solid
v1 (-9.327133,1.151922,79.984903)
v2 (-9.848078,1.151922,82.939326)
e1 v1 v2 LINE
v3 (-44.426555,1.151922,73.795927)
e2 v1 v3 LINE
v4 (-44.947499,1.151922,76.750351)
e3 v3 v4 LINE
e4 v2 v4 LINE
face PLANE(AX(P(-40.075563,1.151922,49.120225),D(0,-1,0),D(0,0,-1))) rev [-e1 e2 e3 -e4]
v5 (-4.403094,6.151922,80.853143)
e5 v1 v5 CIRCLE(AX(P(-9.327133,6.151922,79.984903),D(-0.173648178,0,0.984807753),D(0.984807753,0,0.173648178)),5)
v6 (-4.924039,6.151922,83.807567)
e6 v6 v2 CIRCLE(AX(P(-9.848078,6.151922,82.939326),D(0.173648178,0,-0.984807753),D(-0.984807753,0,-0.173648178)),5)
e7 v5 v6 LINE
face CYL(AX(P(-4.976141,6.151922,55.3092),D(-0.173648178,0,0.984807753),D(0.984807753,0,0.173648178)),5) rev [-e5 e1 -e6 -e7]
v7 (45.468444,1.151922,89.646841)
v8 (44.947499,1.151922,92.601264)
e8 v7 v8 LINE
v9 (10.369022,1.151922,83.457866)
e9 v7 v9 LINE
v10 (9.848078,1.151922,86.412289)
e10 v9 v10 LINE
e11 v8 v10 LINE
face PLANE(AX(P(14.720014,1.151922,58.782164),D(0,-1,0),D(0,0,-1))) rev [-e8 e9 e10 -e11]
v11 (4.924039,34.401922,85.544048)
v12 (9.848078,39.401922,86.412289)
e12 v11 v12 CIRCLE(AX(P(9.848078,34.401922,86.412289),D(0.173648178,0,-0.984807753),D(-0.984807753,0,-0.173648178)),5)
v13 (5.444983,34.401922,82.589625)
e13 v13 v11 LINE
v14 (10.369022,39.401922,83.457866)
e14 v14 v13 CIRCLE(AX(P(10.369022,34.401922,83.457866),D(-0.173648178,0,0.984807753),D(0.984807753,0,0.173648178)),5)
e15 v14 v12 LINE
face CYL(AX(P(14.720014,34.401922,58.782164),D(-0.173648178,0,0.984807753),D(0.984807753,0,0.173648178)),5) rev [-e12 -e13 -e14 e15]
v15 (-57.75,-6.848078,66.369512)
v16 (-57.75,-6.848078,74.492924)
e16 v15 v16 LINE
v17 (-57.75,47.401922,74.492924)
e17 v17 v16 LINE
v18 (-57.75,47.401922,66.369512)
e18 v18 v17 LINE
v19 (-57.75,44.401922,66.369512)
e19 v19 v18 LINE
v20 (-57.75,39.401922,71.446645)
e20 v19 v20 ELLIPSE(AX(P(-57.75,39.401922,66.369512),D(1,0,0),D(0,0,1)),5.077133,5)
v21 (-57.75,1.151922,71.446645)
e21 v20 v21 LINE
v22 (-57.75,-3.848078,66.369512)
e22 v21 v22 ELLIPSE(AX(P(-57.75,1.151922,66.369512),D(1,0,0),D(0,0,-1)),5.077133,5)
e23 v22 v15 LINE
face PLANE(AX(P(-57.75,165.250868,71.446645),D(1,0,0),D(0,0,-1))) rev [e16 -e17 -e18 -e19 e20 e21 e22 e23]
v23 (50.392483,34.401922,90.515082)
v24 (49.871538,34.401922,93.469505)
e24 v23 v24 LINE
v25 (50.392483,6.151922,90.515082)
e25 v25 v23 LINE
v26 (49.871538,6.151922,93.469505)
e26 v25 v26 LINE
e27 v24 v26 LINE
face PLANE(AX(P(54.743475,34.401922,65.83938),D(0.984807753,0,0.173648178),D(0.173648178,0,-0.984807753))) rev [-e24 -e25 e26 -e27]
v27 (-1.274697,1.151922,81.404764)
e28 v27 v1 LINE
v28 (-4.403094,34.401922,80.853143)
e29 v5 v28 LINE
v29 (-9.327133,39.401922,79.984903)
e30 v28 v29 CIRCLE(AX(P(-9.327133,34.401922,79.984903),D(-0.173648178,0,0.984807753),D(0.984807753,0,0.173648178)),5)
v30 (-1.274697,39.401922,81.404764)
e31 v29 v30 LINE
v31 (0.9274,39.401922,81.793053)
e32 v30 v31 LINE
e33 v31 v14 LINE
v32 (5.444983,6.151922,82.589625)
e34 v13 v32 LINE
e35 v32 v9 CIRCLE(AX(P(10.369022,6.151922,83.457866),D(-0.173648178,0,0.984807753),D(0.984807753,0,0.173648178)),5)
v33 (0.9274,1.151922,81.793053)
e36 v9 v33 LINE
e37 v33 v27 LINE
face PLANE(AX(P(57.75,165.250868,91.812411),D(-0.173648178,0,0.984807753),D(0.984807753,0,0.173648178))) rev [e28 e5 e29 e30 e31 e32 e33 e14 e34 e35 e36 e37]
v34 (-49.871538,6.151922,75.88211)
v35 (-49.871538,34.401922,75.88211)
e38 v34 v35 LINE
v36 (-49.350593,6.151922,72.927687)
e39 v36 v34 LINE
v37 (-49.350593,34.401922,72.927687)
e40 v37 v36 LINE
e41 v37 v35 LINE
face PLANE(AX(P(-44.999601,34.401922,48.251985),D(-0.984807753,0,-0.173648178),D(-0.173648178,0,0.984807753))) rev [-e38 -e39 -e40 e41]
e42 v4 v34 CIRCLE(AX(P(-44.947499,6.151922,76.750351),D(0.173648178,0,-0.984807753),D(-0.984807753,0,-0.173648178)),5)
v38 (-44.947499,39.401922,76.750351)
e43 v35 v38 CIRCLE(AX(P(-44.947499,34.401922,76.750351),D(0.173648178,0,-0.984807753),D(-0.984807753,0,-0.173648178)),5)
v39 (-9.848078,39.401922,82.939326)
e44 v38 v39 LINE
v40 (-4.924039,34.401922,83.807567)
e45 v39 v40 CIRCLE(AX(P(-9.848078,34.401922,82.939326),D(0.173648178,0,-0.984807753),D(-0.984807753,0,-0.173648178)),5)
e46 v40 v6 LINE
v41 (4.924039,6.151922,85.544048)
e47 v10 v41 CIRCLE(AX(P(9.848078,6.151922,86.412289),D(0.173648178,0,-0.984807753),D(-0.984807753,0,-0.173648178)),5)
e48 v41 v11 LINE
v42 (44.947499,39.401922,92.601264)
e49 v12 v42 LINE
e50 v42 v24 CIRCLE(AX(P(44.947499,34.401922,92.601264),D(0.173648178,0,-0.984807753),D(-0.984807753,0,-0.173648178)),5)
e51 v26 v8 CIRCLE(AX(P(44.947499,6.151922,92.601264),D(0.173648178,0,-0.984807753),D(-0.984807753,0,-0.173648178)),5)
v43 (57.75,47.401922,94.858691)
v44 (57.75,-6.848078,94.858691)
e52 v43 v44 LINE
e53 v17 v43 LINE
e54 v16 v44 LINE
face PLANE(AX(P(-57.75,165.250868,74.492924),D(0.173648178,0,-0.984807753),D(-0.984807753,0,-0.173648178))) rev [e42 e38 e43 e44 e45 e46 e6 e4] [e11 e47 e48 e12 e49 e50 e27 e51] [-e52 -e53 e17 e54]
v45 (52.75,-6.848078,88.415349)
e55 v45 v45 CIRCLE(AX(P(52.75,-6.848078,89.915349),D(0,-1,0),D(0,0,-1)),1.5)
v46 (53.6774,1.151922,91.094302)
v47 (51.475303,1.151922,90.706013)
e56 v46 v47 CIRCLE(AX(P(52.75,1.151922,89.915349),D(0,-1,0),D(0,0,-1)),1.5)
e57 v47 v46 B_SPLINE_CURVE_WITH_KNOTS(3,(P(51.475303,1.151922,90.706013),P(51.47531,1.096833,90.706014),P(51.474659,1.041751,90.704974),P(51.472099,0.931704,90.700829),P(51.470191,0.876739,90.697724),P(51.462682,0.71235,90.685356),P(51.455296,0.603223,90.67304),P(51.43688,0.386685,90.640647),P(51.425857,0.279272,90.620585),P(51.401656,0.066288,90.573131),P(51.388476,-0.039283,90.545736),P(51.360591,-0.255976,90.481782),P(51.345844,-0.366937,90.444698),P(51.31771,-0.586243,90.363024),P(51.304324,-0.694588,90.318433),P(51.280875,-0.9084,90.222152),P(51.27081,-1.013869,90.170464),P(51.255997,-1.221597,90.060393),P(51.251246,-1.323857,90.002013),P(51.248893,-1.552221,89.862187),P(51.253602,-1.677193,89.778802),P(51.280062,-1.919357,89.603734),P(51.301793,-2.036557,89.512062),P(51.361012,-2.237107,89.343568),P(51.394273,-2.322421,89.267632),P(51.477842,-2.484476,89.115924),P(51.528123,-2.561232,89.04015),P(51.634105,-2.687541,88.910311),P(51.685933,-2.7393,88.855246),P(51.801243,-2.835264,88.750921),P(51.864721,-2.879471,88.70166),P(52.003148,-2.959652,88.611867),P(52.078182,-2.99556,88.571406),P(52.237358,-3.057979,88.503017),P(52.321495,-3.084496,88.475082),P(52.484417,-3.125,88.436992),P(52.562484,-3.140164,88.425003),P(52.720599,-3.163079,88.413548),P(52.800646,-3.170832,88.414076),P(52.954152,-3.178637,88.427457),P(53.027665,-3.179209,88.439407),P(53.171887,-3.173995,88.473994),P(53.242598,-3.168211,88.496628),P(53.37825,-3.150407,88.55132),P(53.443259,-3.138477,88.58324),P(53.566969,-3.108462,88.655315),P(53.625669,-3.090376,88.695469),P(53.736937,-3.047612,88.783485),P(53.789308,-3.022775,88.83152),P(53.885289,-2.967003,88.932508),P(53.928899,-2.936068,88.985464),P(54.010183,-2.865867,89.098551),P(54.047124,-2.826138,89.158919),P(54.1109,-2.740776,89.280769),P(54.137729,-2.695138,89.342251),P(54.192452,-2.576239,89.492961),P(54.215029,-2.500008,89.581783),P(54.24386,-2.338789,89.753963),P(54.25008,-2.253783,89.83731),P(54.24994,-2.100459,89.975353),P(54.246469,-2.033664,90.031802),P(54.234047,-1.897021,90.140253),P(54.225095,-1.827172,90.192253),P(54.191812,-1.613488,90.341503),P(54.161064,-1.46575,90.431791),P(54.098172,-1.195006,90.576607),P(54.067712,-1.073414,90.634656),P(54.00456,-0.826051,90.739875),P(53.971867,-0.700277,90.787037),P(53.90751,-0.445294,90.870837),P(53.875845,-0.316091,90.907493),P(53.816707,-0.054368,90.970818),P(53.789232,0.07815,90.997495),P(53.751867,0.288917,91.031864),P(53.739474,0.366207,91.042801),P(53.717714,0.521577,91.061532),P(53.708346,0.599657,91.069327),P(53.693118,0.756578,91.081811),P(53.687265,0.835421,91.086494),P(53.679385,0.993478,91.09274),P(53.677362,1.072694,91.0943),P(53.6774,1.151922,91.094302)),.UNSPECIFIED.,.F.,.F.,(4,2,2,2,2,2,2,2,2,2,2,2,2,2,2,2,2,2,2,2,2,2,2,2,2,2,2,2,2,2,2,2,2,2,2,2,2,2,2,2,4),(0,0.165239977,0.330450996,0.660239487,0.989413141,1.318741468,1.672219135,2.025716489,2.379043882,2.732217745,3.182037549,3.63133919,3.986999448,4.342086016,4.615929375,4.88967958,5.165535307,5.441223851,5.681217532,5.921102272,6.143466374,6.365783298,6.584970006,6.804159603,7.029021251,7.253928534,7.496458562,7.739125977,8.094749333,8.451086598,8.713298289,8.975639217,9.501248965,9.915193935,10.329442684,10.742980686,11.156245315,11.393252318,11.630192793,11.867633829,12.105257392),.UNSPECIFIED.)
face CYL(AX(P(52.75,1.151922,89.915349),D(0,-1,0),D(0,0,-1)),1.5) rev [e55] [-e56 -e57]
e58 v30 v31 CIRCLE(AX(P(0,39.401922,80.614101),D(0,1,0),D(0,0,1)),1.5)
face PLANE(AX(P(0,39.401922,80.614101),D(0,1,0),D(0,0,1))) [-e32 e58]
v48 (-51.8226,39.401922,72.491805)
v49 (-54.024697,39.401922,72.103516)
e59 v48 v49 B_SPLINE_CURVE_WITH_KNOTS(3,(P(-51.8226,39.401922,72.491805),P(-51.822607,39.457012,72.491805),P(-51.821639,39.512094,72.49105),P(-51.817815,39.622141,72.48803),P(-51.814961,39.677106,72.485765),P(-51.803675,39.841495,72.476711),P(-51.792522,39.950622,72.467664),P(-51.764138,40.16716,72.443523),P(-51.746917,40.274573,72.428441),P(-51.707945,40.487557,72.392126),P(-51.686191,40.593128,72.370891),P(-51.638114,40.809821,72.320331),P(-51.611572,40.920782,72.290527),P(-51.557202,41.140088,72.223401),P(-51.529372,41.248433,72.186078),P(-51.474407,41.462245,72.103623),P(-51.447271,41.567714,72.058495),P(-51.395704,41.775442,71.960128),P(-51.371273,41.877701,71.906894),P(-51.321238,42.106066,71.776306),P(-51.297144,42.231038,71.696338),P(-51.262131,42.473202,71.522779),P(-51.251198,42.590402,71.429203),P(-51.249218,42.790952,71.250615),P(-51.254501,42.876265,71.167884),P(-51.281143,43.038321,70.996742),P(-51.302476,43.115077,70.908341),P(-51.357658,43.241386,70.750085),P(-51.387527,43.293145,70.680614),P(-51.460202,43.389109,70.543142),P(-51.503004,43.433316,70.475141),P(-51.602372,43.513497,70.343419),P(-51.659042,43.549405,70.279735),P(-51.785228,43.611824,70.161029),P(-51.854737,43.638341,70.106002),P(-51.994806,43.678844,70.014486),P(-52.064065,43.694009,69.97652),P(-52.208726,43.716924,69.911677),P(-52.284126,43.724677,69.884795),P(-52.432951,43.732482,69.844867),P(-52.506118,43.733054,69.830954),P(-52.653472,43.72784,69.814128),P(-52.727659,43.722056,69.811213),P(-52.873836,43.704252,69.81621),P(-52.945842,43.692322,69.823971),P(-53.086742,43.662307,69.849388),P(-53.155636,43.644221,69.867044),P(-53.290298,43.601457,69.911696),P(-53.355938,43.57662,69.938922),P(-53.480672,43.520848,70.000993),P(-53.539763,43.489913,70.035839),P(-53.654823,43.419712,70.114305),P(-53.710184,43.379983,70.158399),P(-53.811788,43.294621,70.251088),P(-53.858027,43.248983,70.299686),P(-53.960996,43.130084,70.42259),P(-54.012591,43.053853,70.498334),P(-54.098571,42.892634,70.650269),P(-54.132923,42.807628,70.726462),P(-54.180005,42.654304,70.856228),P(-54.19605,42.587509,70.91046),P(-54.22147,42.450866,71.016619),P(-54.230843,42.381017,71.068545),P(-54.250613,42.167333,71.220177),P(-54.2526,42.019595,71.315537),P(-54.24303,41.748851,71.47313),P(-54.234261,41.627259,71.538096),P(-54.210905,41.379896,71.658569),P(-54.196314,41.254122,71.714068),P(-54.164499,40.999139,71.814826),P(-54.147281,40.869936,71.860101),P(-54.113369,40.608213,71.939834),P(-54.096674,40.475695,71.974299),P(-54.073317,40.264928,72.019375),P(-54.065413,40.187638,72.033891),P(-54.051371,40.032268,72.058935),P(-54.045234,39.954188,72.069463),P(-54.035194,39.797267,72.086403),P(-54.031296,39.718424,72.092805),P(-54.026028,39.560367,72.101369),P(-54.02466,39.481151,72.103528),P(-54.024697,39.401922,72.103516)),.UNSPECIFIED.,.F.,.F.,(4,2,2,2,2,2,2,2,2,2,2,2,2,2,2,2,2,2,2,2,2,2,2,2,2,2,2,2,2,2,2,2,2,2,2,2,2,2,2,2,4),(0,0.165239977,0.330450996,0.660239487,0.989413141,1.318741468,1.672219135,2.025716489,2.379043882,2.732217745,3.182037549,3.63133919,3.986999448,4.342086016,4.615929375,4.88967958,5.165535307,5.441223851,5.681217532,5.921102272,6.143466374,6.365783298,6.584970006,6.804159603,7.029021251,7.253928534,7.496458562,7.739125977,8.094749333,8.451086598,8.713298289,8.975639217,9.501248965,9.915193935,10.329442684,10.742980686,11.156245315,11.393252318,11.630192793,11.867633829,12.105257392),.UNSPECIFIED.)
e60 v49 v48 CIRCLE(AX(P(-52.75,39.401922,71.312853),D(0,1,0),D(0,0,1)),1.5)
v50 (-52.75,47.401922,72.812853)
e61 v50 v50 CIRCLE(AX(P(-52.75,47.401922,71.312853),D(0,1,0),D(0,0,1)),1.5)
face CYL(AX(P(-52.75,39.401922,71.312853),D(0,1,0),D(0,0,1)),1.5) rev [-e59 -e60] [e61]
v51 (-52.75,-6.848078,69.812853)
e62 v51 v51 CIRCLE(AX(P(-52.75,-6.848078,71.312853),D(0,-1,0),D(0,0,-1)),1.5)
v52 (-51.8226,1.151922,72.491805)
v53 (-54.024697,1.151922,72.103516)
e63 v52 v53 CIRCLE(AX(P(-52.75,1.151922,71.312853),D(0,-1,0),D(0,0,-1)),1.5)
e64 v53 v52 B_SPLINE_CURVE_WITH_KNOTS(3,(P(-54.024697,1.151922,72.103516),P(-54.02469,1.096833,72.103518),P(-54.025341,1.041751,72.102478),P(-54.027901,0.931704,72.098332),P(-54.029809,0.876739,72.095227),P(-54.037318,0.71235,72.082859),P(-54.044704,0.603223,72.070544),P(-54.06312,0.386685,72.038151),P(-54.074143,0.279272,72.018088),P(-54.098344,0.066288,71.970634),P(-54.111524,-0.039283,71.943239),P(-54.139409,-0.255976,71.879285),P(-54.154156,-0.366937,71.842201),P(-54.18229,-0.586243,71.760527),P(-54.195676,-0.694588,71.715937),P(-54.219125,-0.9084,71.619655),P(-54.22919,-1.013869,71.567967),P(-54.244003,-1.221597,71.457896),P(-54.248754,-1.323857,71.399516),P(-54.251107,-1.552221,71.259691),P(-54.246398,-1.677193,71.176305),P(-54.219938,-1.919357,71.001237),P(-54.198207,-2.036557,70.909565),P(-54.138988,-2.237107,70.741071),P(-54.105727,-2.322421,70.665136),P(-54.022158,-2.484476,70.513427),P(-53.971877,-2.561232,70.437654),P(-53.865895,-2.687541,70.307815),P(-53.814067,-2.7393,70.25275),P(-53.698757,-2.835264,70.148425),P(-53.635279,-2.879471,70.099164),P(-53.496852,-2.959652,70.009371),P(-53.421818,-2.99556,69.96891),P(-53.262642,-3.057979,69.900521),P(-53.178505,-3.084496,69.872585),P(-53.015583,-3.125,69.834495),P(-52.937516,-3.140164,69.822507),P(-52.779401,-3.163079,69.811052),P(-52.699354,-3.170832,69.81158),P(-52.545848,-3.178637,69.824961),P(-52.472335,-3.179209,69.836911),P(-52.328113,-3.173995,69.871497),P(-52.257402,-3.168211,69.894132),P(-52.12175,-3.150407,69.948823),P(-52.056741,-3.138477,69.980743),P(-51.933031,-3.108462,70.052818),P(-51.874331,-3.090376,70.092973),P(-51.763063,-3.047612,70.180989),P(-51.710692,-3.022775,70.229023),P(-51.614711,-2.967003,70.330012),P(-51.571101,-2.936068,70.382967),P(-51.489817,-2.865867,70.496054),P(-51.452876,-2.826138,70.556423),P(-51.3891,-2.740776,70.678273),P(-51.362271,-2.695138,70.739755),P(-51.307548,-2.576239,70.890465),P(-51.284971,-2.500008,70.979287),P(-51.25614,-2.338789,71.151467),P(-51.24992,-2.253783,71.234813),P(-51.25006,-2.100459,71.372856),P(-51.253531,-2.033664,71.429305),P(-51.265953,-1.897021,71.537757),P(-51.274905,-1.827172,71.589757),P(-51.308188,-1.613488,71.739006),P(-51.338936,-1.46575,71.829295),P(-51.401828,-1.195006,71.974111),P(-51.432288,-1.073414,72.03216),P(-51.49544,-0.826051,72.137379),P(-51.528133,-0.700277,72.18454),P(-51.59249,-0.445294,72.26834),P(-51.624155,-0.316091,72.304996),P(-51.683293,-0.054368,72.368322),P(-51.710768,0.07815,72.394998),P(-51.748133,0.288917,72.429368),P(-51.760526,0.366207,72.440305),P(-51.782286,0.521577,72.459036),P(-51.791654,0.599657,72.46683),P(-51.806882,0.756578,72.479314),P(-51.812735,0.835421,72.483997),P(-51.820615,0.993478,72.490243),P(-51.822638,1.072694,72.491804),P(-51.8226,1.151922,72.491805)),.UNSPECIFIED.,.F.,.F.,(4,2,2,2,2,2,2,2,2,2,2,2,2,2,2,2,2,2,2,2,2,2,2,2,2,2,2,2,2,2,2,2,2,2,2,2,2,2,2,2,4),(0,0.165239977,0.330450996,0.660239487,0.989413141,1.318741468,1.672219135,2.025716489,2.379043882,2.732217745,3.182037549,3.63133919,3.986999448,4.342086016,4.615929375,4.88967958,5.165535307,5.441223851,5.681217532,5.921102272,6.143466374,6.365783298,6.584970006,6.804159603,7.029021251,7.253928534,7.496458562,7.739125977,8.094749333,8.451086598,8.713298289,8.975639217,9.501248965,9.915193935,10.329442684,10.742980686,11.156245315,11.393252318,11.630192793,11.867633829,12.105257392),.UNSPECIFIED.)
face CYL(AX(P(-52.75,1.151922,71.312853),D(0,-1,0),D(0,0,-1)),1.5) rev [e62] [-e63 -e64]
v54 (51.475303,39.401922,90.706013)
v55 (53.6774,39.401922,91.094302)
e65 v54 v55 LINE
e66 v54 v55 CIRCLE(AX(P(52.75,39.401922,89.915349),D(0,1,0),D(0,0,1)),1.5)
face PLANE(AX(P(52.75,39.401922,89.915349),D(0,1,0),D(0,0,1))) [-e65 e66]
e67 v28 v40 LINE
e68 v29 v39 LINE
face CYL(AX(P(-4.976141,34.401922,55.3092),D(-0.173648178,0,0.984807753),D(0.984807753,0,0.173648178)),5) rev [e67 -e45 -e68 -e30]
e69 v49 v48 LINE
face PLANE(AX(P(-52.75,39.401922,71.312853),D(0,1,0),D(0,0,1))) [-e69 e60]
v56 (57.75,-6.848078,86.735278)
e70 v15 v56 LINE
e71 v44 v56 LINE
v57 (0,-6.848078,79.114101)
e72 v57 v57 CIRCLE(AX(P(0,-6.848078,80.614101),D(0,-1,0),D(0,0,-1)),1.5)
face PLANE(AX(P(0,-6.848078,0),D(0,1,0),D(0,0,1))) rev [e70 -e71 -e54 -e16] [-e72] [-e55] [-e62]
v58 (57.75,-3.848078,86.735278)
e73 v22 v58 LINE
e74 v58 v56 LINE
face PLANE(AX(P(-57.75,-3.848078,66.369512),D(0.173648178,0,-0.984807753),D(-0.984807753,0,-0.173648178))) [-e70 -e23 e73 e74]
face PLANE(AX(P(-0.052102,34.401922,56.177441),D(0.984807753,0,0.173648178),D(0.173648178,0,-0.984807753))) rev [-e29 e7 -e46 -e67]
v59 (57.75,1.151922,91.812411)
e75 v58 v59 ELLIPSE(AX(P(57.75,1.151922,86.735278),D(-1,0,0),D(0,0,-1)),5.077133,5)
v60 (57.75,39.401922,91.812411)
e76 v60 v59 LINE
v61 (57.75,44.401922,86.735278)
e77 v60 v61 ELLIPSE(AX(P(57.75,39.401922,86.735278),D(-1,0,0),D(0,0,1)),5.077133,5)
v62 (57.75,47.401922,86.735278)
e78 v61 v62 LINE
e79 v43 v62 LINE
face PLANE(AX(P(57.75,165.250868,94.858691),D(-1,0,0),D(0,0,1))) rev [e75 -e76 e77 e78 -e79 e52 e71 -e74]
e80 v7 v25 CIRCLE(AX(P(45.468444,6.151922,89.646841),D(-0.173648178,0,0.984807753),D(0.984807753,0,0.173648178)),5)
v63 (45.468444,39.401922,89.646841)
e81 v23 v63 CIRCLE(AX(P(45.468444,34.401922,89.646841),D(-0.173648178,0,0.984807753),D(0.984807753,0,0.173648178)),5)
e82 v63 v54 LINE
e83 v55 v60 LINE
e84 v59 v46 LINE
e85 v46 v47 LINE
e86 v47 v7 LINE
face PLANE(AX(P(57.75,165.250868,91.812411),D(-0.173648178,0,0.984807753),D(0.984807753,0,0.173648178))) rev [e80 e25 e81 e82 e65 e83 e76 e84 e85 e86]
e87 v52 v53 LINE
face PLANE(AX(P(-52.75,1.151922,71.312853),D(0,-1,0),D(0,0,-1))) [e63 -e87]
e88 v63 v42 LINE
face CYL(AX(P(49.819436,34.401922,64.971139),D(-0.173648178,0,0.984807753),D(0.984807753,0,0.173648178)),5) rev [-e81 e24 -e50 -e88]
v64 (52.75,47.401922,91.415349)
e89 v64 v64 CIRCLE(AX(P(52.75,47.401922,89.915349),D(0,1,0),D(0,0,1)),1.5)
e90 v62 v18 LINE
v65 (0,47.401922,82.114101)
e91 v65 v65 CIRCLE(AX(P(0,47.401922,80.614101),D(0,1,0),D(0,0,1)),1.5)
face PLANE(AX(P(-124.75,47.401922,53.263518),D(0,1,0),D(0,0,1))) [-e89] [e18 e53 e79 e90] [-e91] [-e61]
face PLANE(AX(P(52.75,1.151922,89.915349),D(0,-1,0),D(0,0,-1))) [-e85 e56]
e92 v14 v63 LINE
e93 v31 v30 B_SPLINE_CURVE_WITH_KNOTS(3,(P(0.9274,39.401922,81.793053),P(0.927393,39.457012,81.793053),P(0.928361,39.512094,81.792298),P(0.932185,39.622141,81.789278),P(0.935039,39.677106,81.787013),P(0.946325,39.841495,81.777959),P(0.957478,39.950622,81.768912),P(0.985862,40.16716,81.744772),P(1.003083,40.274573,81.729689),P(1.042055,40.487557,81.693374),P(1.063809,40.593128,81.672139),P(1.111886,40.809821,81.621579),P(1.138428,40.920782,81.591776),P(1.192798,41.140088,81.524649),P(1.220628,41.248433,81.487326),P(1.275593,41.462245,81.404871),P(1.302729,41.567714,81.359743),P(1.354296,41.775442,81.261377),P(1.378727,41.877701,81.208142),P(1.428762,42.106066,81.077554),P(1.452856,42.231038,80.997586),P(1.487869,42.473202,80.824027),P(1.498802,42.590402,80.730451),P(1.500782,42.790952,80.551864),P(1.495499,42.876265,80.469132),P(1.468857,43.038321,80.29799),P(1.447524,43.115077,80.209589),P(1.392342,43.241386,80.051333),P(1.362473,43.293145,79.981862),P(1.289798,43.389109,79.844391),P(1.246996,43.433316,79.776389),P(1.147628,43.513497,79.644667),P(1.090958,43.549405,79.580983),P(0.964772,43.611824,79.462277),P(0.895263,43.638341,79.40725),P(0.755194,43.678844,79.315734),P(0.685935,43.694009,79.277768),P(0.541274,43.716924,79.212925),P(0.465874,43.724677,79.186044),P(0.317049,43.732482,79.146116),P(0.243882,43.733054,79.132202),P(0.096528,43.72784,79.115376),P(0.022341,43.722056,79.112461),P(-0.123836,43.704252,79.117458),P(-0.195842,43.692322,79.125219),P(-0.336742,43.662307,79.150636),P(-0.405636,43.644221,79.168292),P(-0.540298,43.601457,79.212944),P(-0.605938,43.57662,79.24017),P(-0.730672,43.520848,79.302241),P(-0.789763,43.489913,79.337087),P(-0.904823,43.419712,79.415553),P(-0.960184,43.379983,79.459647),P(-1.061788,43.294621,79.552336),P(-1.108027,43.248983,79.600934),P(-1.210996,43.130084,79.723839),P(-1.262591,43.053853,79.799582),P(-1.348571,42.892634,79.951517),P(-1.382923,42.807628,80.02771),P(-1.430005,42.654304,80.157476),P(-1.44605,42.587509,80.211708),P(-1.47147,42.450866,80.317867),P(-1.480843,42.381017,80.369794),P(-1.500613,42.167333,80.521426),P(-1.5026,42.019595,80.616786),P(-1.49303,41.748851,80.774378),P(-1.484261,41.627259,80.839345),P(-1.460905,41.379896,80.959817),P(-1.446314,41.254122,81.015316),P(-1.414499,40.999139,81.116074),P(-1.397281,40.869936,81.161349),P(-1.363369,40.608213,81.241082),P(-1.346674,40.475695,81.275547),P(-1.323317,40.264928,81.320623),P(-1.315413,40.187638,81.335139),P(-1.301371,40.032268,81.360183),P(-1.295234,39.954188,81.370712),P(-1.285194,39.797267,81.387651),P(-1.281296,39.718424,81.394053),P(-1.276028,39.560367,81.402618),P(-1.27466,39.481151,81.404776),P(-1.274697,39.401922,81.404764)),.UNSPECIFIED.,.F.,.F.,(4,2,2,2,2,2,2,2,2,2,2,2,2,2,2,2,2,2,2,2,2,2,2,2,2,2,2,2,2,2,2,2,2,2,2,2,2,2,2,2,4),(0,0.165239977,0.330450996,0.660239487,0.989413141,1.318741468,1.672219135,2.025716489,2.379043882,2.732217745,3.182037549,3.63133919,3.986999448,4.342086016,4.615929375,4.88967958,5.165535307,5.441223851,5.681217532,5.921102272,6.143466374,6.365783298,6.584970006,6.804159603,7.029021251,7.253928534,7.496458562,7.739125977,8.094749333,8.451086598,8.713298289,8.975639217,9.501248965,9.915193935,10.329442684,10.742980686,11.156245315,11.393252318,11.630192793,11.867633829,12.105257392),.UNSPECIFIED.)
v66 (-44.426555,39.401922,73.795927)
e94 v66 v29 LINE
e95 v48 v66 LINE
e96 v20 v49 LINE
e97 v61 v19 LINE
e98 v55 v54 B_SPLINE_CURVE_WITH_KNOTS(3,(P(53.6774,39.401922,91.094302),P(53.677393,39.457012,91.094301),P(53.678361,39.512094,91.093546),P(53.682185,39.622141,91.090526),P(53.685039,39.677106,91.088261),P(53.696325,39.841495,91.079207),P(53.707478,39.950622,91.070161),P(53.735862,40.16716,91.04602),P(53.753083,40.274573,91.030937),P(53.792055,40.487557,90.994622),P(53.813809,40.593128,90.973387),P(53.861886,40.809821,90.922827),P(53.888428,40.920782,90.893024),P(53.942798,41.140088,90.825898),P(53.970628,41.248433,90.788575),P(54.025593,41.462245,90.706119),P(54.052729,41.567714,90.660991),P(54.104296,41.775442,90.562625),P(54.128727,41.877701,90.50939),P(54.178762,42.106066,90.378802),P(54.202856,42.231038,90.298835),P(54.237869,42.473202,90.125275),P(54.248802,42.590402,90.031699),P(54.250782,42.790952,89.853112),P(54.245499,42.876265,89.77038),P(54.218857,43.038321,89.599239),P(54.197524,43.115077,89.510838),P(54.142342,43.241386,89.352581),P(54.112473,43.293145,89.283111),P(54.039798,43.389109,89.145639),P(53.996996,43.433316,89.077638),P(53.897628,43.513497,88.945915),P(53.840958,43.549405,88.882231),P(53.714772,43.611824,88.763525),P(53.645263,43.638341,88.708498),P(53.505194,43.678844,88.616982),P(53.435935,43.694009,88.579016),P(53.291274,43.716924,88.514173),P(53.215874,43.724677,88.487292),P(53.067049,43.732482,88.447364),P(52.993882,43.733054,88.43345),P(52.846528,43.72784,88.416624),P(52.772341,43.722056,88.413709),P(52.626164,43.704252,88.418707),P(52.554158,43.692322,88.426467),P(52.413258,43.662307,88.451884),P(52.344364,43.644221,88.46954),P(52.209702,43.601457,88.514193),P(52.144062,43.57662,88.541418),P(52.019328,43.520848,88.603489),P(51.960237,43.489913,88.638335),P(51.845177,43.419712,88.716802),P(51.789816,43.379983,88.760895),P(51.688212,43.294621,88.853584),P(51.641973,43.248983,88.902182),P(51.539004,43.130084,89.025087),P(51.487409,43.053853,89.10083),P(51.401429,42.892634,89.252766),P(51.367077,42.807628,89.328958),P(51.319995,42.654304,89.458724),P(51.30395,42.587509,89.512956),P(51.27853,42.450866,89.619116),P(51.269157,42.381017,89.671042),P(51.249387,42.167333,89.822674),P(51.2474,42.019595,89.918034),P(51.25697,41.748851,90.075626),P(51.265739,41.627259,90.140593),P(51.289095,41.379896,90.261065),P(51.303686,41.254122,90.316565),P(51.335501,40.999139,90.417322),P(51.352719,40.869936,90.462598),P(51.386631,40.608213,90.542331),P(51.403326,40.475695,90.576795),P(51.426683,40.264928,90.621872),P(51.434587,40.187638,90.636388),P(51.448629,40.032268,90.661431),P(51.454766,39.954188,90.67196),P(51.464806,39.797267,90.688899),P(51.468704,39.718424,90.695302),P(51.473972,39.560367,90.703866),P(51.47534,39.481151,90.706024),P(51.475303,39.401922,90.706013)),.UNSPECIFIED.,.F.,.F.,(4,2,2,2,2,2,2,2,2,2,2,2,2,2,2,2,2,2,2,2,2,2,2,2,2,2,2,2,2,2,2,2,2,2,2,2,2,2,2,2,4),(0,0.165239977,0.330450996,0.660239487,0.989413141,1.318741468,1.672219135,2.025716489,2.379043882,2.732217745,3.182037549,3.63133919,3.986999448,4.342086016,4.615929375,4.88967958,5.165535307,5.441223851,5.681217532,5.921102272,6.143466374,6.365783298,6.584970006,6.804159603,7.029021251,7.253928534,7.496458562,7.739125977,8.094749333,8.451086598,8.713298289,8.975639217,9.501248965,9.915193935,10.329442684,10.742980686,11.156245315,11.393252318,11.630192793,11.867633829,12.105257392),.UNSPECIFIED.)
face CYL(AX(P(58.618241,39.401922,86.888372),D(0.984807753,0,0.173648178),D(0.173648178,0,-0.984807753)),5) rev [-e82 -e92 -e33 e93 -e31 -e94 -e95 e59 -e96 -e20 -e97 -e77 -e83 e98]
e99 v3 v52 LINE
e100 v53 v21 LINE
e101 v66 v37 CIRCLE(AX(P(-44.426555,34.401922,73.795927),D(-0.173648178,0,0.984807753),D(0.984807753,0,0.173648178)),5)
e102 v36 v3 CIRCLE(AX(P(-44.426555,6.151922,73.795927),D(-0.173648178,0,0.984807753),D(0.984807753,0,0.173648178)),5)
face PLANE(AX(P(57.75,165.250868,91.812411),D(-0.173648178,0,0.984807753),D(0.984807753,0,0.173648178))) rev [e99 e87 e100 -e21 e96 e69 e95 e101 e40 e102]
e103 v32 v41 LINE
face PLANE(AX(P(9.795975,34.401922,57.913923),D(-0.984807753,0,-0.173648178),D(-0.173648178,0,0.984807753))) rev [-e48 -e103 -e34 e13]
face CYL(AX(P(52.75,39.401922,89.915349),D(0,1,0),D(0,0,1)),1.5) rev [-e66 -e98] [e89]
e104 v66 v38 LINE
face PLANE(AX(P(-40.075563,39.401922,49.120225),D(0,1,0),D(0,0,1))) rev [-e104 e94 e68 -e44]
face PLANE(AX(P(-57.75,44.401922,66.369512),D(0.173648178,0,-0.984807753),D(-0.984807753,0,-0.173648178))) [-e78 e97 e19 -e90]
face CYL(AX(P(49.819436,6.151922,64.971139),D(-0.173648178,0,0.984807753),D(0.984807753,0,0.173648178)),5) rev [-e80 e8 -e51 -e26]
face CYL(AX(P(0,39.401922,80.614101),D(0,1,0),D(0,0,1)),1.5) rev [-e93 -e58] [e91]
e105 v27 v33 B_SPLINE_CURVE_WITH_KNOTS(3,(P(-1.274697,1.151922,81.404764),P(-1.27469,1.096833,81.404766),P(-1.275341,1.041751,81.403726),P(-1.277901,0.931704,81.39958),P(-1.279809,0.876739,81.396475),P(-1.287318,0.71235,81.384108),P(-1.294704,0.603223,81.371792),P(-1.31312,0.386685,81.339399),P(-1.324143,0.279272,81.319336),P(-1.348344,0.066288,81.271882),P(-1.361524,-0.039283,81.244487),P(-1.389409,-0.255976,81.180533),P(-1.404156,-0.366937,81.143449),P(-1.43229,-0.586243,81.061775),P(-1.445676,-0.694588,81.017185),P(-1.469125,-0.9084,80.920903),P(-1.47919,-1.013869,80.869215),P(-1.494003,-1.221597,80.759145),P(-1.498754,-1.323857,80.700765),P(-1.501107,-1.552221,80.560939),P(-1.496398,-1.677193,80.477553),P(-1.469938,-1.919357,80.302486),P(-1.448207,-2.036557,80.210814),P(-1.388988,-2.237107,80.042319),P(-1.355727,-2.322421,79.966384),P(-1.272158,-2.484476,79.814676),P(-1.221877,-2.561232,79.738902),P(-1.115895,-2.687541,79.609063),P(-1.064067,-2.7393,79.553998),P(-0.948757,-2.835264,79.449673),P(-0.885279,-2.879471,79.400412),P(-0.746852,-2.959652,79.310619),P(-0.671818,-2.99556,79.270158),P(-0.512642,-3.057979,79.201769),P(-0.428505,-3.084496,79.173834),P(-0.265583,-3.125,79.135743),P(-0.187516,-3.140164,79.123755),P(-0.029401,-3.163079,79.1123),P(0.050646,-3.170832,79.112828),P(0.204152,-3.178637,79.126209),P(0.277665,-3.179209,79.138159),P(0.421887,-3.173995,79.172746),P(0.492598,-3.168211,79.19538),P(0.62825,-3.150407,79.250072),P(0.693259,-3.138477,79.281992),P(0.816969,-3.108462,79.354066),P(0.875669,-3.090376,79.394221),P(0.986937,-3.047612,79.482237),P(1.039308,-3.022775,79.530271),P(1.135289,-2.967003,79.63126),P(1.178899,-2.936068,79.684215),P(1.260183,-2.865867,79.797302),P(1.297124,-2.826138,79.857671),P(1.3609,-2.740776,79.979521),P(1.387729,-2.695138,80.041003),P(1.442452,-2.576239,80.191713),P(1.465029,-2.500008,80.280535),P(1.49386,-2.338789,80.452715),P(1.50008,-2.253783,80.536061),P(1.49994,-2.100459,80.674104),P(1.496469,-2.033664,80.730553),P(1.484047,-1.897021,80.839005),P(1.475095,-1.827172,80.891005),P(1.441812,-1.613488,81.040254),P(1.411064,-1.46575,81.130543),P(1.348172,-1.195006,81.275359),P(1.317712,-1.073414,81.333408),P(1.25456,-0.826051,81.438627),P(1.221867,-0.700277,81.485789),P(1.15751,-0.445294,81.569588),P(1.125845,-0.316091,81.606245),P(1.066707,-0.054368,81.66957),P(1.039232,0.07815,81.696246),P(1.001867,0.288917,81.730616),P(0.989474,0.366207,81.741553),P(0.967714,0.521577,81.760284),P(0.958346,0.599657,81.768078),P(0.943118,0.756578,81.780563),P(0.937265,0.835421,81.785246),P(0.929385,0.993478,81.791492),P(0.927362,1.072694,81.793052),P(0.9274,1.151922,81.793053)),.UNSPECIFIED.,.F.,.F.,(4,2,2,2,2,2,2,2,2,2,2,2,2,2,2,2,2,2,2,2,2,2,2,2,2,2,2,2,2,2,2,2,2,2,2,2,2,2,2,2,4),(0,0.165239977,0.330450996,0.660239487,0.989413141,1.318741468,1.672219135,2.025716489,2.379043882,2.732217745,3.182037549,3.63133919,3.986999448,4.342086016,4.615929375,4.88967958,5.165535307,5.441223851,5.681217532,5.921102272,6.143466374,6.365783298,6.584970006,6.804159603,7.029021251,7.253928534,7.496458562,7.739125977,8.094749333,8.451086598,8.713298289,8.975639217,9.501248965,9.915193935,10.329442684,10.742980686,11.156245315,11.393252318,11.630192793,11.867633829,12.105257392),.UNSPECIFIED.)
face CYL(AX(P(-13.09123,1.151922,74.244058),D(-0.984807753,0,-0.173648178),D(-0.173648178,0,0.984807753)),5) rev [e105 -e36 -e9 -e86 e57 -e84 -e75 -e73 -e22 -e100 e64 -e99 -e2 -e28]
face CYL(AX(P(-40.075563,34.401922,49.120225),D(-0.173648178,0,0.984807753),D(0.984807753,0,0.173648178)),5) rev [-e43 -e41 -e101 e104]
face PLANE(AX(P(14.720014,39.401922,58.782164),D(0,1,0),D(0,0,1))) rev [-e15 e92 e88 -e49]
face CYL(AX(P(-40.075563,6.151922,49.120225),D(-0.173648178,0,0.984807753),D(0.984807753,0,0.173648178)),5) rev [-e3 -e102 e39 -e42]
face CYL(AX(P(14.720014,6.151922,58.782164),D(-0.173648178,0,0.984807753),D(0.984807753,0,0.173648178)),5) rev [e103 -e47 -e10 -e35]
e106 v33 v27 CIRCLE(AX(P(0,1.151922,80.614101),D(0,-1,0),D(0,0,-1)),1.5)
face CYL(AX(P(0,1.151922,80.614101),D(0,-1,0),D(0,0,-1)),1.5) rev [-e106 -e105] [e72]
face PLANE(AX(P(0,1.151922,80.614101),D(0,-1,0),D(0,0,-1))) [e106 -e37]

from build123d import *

# Parameters (mm, degrees)
MAIN_BRACKET_EXTRUDE_DEPTH        = 54.25
TOP_SCREWHOLE_EXTENSION_DEPTH     = 3
BOTTOM_SCREWHOLE_EXTENSION_DEPTH  = 3
SCREWHOLE_EXTENSION_FILLETS_5MM_R = 5
SKETCH4_R                         = 1.5
TOP_SCREWHOLES_DEPTH              = 8
BOTTOM_START                      = -8
SKETCH5_R                         = 1.5
BOTTOM_SCREWHOLES_DEPTH           = 8
WEIGHT_REDUCTION_DEPTH            = 88.819886832
WEIGHT_REDUCTION_DEPTH_BACK       = 88.819886832


with BuildPart() as part:
    # Sketch1 → Main bracket extrude (new body)
    with BuildSketch(Plane(origin=(0, -6.84807753, 0), x_dir=(1, 0, 0), z_dir=(0, 1, 0))):
        Polygon((-57.75, -74.492924432), (57.75, -94.858690704), (57.75, -91.812410869), (-57.75, -71.446644597), align=None)
    extrude(amount=MAIN_BRACKET_EXTRUDE_DEPTH)

    # Sketch2 → Top screwhole extension (add)
    with BuildSketch(Plane(origin=(0, 47.40192247, 0), x_dir=(1, 0, 0), z_dir=(0, 1, 0))):
        Polygon((-57.75, -74.492924432), (-57.75, -66.369511537), (57.75, -86.735277809), (57.75, -94.858690704), align=None)
    extrude(amount=-TOP_SCREWHOLE_EXTENSION_DEPTH)

    # Sketch3 → Bottom screwhole extension (add)
    with BuildSketch(Plane.XZ.offset(6.84807753)):
        Polygon((-57.75, 74.492924432), (-57.75, 66.369511537), (57.75, 86.735277809), (57.75, 94.858690704), align=None)
    extrude(amount=-BOTTOM_SCREWHOLE_EXTENSION_DEPTH)

    # Screwhole extension fillets 5mm
    screwhole_extension_fillets_5mm_edges = [part.edges().sort_by_distance(p)[0] for p in [
        (0, 44.40192247, 81.629527733),
        (0, -3.84807753, 81.629527733),
    ]]
    fillet(screwhole_extension_fillets_5mm_edges, radius=SCREWHOLE_EXTENSION_FILLETS_5MM_R - 0.0001)  # a hair under: the kernel refuses the full size

    # Sketch4 → Top screwholes (cut)
    with BuildSketch(Plane(origin=(0, 47.40192247, 0), x_dir=(1, 0, 0), z_dir=(0, 1, 0))):
        with Locations(Location((-52.75, -71.312852888, 0), (0, 0, 270))):
            Circle(SKETCH4_R)
        with Locations(Location((0, -80.614101121, 0), (0, 0, 270))):
            Circle(SKETCH4_R)
        with Locations(Location((52.75, -89.915349353, 0), (0, 0, 270))):
            Circle(SKETCH4_R)
    extrude(amount=-TOP_SCREWHOLES_DEPTH, mode=Mode.SUBTRACT)

    # Sketch5 → Bottom screwholes (cut)
    with BuildSketch(Plane.XZ.offset(6.84807753).offset(BOTTOM_START)):
        with Locations(Location((52.75, 89.915349353, 0), (0, 0, 90))):
            Circle(SKETCH5_R)
        with Locations(Location((0, 80.614101121, 0), (0, 0, 90))):
            Circle(SKETCH5_R)
        with Locations(Location((-52.75, 71.312852888, 0), (0, 0, 90))):
            Circle(SKETCH5_R)
    extrude(amount=BOTTOM_SCREWHOLES_DEPTH, mode=Mode.SUBTRACT)

    # Sketch6 → Weight reduction (cut, two sides: drawn at the far end of the back side and taken through both)
    with BuildSketch(Plane(origin=(-14.48041592, 0, 82.12251955), x_dir=(0.9848077530122094, 0, 0.17364817766692336), z_dir=(-0.17364817766692334, 0, 0.9848077530122092)).offset(-WEIGHT_REDUCTION_DEPTH_BACK)):
        with BuildLine():
            Line((-30.93708716, 39.40192247), (4.703799677, 39.40192247))
            ThreePointArc((4.703799677, 39.40192247), (8.239333583, 37.937456376), (9.703799677, 34.40192247))
            Line((9.703799677, 34.40192247), (9.703799677, 6.15192247))
            ThreePointArc((9.703799677, 6.15192247), (8.239333583, 2.616388564), (4.703799677, 1.15192247))
            Line((4.703799677, 1.15192247), (-30.93708716, 1.15192247))
            ThreePointArc((-30.93708716, 1.15192247), (-34.472621066, 2.616388564), (-35.93708716, 6.15192247))
            Line((-35.93708716, 6.15192247), (-35.93708716, 34.40192247))
            ThreePointArc((-35.93708716, 34.40192247), (-34.472621066, 37.937456376), (-30.93708716, 39.40192247))
        make_face()
        with BuildLine():
            Line((24.703799677, 39.40192247), (60.344686513, 39.40192247))
            ThreePointArc((60.344686513, 39.40192247), (63.880220419, 37.937456376), (65.344686513, 34.40192247))
            Line((65.344686513, 34.40192247), (65.344686513, 6.15192247))
            ThreePointArc((65.344686513, 6.15192247), (63.880220419, 2.616388564), (60.344686513, 1.15192247))
            Line((60.344686513, 1.15192247), (24.703799677, 1.15192247))
            ThreePointArc((24.703799677, 1.15192247), (21.168265771, 2.616388564), (19.703799677, 6.15192247))
            Line((19.703799677, 6.15192247), (19.703799677, 34.40192247))
            ThreePointArc((19.703799677, 34.40192247), (21.168265771, 37.937456376), (24.703799677, 39.40192247))
        make_face()
    extrude(amount=WEIGHT_REDUCTION_DEPTH + WEIGHT_REDUCTION_DEPTH_BACK, mode=Mode.SUBTRACT)


solid = part.part
